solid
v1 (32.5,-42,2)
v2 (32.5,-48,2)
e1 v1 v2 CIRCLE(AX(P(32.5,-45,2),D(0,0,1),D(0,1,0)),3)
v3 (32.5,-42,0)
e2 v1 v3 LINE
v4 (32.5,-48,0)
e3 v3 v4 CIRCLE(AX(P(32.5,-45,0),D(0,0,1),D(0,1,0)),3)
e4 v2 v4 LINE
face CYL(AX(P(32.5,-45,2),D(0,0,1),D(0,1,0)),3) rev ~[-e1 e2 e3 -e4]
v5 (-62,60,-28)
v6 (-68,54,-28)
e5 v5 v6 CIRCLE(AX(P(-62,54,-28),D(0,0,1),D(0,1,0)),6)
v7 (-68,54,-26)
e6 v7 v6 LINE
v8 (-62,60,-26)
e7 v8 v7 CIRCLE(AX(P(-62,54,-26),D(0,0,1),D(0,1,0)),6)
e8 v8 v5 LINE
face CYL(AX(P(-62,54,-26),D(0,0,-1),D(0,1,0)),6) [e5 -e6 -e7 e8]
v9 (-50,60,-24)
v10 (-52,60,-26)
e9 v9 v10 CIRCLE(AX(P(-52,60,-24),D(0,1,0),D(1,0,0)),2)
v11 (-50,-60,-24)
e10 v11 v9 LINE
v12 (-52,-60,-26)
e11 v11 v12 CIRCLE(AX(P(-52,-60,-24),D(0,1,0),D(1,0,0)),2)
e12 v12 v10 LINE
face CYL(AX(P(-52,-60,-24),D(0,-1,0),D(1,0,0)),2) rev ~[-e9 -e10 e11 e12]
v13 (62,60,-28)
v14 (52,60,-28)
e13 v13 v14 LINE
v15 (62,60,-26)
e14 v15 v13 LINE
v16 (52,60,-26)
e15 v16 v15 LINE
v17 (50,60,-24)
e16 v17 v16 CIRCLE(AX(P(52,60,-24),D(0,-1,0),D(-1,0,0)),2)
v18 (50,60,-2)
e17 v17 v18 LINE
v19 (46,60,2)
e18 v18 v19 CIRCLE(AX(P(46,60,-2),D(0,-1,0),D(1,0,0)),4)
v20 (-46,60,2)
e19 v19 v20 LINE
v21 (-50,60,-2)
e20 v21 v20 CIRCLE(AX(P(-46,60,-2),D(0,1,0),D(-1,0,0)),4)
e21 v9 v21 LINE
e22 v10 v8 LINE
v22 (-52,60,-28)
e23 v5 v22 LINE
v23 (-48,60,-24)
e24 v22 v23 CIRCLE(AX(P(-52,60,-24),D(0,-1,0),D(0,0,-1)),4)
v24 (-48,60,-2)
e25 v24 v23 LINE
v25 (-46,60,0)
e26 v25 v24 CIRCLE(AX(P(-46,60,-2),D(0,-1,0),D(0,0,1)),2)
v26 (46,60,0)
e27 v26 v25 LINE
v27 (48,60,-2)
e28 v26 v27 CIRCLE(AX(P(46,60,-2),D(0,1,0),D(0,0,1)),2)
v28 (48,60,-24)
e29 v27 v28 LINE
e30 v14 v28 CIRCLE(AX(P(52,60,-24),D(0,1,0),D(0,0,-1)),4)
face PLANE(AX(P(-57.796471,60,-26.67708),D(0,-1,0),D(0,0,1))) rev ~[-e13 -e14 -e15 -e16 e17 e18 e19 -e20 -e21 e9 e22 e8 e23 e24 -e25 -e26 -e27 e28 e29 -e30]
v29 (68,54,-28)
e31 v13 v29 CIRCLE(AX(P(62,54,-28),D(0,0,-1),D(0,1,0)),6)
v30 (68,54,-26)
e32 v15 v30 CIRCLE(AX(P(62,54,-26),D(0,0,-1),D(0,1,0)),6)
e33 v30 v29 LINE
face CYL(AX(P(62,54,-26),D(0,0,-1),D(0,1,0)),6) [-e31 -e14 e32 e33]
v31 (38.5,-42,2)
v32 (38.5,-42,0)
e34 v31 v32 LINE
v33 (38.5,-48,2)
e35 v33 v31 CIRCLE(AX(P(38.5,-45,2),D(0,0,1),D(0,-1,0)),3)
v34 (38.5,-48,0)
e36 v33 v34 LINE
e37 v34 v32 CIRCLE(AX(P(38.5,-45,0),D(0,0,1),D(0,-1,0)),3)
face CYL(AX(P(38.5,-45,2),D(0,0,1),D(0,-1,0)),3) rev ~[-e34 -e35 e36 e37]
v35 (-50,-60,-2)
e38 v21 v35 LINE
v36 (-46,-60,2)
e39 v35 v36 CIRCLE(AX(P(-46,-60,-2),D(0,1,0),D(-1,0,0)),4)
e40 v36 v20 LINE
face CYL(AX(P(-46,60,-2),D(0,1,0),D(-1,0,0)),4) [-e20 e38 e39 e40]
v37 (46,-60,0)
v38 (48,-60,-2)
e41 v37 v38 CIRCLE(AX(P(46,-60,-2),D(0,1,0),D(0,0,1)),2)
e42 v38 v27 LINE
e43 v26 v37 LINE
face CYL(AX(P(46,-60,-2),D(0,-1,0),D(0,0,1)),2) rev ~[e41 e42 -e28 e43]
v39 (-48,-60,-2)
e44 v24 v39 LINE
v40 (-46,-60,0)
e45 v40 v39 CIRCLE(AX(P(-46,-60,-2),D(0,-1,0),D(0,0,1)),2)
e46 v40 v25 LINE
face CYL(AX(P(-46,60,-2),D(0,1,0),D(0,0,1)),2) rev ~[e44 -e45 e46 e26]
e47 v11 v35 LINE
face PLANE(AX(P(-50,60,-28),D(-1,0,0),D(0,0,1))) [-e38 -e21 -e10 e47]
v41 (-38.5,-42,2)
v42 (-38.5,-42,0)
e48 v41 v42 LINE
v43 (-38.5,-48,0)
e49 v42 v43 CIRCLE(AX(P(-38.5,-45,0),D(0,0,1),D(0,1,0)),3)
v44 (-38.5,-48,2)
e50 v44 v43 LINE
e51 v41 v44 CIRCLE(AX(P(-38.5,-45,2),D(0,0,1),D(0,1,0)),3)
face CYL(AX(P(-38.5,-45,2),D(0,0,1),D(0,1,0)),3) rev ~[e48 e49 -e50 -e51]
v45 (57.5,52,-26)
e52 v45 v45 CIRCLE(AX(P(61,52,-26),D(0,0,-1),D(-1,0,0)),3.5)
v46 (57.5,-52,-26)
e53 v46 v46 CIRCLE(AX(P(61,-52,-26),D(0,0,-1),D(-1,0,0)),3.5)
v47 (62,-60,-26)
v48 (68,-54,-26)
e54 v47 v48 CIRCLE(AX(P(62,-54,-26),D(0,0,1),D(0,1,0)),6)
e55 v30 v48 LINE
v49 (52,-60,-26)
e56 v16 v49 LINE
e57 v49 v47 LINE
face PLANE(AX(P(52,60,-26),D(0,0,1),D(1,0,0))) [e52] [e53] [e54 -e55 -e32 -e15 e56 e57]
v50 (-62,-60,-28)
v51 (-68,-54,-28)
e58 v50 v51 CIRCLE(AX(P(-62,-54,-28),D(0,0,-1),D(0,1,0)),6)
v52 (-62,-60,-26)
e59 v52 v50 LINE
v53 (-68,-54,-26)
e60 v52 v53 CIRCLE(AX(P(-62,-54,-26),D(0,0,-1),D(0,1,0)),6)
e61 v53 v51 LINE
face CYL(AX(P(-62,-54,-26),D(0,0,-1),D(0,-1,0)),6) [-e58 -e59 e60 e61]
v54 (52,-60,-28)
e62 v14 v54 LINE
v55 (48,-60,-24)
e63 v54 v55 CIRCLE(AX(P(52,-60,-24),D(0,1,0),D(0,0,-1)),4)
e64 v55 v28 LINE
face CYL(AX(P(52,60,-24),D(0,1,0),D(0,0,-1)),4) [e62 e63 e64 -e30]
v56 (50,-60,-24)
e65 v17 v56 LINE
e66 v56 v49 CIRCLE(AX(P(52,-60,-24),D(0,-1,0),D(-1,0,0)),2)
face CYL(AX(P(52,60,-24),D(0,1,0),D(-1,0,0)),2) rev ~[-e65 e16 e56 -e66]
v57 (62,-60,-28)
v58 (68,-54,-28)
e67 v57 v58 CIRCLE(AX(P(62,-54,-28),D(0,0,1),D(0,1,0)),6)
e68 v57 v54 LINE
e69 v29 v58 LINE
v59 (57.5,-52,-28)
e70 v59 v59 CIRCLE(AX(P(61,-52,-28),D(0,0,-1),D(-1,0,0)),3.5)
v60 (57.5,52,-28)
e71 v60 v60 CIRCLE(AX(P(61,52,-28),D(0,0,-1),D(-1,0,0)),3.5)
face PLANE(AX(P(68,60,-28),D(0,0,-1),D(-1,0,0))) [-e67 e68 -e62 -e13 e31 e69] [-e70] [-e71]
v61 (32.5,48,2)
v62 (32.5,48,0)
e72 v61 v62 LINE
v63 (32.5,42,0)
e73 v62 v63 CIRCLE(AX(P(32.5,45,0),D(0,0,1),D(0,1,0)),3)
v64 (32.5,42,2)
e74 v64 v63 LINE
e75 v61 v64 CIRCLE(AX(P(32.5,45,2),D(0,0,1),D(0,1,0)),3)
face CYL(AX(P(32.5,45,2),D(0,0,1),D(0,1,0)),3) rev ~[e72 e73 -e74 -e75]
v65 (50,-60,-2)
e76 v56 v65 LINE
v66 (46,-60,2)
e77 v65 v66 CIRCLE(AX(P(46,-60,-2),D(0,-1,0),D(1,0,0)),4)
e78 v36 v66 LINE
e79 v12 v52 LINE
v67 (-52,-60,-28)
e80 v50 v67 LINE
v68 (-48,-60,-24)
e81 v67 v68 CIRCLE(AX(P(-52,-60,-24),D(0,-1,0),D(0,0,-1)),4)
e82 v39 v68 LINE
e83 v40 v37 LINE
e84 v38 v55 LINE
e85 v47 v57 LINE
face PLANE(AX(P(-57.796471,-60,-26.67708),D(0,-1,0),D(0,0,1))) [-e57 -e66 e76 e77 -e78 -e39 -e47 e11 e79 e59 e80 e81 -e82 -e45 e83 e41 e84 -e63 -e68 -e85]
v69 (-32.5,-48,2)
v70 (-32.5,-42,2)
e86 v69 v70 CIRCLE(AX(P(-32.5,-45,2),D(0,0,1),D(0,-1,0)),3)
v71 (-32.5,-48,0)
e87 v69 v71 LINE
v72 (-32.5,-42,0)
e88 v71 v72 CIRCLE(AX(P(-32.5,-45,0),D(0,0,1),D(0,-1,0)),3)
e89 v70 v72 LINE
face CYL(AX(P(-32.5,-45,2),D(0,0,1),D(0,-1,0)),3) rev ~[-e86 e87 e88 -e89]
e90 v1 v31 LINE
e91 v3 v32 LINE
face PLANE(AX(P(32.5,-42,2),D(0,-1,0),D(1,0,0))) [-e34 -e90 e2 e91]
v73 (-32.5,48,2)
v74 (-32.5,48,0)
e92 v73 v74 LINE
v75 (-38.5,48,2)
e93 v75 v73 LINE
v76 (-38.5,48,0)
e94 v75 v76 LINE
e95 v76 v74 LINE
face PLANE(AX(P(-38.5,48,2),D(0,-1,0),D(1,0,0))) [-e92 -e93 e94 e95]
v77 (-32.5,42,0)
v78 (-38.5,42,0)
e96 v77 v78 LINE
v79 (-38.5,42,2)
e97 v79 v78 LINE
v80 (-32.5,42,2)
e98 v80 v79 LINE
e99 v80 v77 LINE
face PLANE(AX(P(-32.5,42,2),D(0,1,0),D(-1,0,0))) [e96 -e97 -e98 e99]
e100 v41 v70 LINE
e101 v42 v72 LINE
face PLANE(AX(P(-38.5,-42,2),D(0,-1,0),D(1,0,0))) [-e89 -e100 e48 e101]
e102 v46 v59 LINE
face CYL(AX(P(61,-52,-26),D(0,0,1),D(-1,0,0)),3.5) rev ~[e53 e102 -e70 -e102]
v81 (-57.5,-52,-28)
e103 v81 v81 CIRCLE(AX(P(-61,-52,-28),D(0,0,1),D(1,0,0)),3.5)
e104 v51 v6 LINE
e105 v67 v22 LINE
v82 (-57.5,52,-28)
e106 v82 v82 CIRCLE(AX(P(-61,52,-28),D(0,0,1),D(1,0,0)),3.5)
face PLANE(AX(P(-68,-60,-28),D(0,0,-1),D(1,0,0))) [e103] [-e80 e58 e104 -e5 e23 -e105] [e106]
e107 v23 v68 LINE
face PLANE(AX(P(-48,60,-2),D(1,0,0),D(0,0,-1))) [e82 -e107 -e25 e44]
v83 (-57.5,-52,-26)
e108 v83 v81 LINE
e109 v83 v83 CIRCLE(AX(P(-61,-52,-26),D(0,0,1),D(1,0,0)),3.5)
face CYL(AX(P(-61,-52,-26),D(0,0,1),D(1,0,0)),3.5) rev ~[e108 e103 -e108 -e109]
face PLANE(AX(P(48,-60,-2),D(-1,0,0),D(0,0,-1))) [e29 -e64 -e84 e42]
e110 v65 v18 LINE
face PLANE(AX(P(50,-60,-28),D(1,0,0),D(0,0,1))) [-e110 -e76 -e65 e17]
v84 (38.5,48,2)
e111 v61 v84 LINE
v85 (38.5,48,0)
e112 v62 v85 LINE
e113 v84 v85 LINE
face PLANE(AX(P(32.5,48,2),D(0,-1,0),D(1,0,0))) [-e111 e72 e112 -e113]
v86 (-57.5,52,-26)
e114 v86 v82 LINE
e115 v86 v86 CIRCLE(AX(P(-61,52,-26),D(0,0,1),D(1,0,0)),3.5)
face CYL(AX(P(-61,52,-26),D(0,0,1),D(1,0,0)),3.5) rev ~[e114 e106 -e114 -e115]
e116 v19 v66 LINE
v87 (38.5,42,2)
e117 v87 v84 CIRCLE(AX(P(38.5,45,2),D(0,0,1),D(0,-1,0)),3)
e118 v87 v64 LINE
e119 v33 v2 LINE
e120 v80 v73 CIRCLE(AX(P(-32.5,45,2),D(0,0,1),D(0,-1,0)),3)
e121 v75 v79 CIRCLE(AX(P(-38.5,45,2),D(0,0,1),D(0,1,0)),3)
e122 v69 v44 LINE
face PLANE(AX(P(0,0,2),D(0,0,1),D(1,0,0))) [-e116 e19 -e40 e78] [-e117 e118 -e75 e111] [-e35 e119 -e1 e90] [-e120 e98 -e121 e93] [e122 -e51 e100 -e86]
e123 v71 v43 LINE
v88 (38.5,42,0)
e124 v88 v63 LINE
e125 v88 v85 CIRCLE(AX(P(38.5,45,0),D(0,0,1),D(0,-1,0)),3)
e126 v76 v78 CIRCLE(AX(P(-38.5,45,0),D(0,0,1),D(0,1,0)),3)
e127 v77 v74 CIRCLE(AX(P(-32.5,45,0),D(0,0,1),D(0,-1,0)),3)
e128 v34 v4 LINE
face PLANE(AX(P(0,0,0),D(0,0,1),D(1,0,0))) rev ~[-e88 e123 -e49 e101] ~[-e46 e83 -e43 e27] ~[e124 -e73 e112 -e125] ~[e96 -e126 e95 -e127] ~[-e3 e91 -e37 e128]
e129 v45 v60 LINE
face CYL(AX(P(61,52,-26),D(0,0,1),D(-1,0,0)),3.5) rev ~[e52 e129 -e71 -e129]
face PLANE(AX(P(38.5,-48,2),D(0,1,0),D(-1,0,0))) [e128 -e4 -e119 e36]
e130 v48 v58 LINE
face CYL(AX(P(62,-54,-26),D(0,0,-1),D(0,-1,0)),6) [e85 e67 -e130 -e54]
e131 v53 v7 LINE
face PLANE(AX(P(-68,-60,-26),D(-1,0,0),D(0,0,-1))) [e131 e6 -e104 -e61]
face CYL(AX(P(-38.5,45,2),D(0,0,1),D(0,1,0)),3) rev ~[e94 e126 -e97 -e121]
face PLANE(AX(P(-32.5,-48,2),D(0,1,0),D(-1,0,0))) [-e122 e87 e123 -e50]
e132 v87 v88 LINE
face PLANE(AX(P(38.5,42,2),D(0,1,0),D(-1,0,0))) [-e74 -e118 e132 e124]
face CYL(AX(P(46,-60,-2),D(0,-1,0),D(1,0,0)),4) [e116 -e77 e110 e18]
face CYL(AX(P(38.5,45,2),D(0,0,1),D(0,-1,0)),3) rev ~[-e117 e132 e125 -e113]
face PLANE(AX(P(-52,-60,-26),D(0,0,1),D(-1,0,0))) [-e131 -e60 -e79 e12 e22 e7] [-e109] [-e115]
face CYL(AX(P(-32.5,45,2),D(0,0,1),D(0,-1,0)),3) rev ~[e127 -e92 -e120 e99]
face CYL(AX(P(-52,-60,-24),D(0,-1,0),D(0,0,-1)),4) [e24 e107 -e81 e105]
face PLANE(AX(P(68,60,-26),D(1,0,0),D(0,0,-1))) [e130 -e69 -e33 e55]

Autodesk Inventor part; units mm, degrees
ref_plane "YZ Plane" through (0, 0, 0) normal (1, 0, 0) x (0, 1, 0)
ref_plane "XZ Plane" through (0, 0, 0) normal (0, 1, 0) x (-1, 0, 0)
ref_plane "XY Plane" through (0, 0, 0) normal (0, 0, 1) x (1, 0, 0)
sketch "Sketch1" plane through (0, 0, 0) normal (0, 0, 1) x (1, 0, 0)
  line L0 (-50, -60) -> (50, -60)
  line L1 (50, -60) -> (50, 60)
  line L2 (50, 60) -> (-50, 60)
  line L3 (-50, 60) -> (-50, -60)
  line L4 (-50, -60) -> (50, 60) construction
  line L5 (50, -60) -> (-50, 60) construction
  point P0 (0, 0)
  dimension "d0" = 100
  dimension "d1" = 120
extrude "Plate1" add sketch "Sketch1" along normal blind 2
sketch "Sketch5" plane through (48, -60, 2) normal (1, 0, 0) x (0, 1, 0)
  line L0 (120, 0) -> (0, 0)
  line L1 (0, 0) -> (0, -30)
  line L2 (0, -30) -> (120, -30)
  line L3 (120, -30) -> (120, 0)
edge flange "Flange2" height 30 angle 90 thickness 2 bend radius 2 thickness toward (1, 0, 0) relief tear relief width 2 relief depth 1 corner gap 2 corner form 0 edges at (50, 0, 0) (-50, 0, 0) wall of the first edge with corners at (48, 60, 2) (48, -60, 2) (48, -60, -28) (48, 60, -28)
bend "Bend2"
corner "Corner2"
sketch "Sketch6" plane through (-48, -60, -26) normal (0, 0, -1) x (-1, 0, 0)
  line L0 (0, 120) -> (0, 0)
  line L1 (0, 0) -> (20, 0)
  line L2 (20, 0) -> (20, 120)
  line L3 (20, 120) -> (0, 120)
edge flange "Flange3" height 20 angle 90 thickness 2 bend radius 2 thickness toward (0, 0, -1) relief tear relief width 2 relief depth 1 corner gap 2 corner form 0 edges at (-50, 0, -28) (50, 0, -28) wall of the first edge with corners at (-48, 60, -26) (-48, -60, -26) (-68, -60, -26) (-68, 60, -26)
bend "Bend3"
corner "Corner3"
sketch "Sketch7" plane through (0, 0, 2) normal (0, 0, 1) x (1, 0, 0)
  line L0 (-38.5, 45) -> (-32.5, 45) construction
  line L1 (-38.5, 48) -> (-32.5, 48)
  line L2 (-32.5, 42) -> (-38.5, 42)
  arc A0 (-38.5, 48) -> (-38.5, 42) centre (-38.5, 45) ccw
  arc A1 (-32.5, 42) -> (-32.5, 48) centre (-32.5, 45) ccw
  line L3 (0, 0) -> (0, 36.7508)
  line L4 (0, 0) -> (-25.7119, 0)
  line L5 (32.5, 45) -> (38.5, 45) construction
  line L6 (32.5, 48) -> (38.5, 48)
  line L7 (38.5, 42) -> (32.5, 42)
  arc A2 (32.5, 48) -> (32.5, 42) centre (32.5, 45) ccw
  arc A3 (38.5, 42) -> (38.5, 48) centre (38.5, 45) ccw
  line L8 (-38.5, -45) -> (-32.5, -45) construction
  line L9 (-38.5, -42) -> (-32.5, -42)
  line L10 (-32.5, -48) -> (-38.5, -48)
  arc A4 (-38.5, -42) -> (-38.5, -48) centre (-38.5, -45) ccw
  arc A5 (-32.5, -48) -> (-32.5, -42) centre (-32.5, -45) ccw
  line L11 (32.5, -45) -> (38.5, -45) construction
  line L12 (32.5, -42) -> (38.5, -42)
  line L13 (38.5, -48) -> (32.5, -48)
  arc A6 (32.5, -42) -> (32.5, -48) centre (32.5, -45) ccw
  arc A7 (38.5, -48) -> (38.5, -42) centre (38.5, -45) ccw
  point P0 (-35.5, 45)
  point P1 (35.5, 45)
  point P2 (-35.5, -45)
  point P3 (35.5, -45)
  dimension "d42" = 6
  dimension "d43" = 6
  dimension "d50" = 71
  dimension "d51" = 90
extrude "Cut1" cut sketch "Sketch7" against normal blind 2
sketch "Sketch8" plane through (-68, -60, -26) normal (0, 0, 1) x (1, 0, 0)
  circle A0 centre (7, 112) radius 3.5
  circle A1 centre (7, 8) radius 3.5
  line L0 (16, 120) -> (0, 120) projected
  line L1 (0, 120) -> (0, 0) projected
  line L2 (0, 60) -> (53.6667, 60)
  point P0 (68, 60)
  dimension "d54" = 7
  dimension "d55" = 8
  dimension "d56" = 7
extrude "Cut2" cut sketch "Sketch8" against normal blind 2
mirror "Mirror1" about plane through (0, 0, 0) normal (1, 0, 0) of "Cut2"
fillet "Corner Round1" radius 6 4 edges at (-68, -60, -27) (-68, 60, -27) (68, 60, -27) (68, -60, -27)
equation "\"d52\" = Thickness"
equation "\"d57\" = Thickness"
equation "\"d2\" = Thickness"
equation "\"d22\" = BendReliefWidth"
equation "\"d23\" = BendReliefDepth"
equation "\"d24\" = MinimumRemnant"
equation "\"d25\" = TransitionRadius"
equation "\"d28\" = BendRadius"
equation "\"d29\" = CornerReliefSize"
equation "\"d30\" = GapSize"
equation "\"d31\" = JacobiRadiusSize"
equation "\"d32\" = BendReliefWidth"
equation "\"d33\" = BendReliefDepth"
equation "\"d34\" = MinimumRemnant"
equation "\"d35\" = TransitionRadius"
equation "\"d38\" = BendRadius"
equation "\"d39\" = CornerReliefSize"
equation "\"d40\" = GapSize"
equation "\"d41\" = JacobiRadiusSize"
equation "\"BendRadius\" = Thickness"
equation "\"BendReliefWidth\" = Thickness"
equation "\"BendReliefDepth\" = 0.5 * Thickness"
equation "\"CornerReliefSize\" = 4 * Thickness"
equation "\"MinimumRemnant\" = 2 * Thickness"
equation "\"TransitionRadius\" = BendRadius"
equation "\"JacobiRadiusSize\" = BendRadius"
equation "\"GapSize\" = Thickness"
equation "\"Thickness\" = 2"
properties part number "PNS- motor 030 reductor pillar"
